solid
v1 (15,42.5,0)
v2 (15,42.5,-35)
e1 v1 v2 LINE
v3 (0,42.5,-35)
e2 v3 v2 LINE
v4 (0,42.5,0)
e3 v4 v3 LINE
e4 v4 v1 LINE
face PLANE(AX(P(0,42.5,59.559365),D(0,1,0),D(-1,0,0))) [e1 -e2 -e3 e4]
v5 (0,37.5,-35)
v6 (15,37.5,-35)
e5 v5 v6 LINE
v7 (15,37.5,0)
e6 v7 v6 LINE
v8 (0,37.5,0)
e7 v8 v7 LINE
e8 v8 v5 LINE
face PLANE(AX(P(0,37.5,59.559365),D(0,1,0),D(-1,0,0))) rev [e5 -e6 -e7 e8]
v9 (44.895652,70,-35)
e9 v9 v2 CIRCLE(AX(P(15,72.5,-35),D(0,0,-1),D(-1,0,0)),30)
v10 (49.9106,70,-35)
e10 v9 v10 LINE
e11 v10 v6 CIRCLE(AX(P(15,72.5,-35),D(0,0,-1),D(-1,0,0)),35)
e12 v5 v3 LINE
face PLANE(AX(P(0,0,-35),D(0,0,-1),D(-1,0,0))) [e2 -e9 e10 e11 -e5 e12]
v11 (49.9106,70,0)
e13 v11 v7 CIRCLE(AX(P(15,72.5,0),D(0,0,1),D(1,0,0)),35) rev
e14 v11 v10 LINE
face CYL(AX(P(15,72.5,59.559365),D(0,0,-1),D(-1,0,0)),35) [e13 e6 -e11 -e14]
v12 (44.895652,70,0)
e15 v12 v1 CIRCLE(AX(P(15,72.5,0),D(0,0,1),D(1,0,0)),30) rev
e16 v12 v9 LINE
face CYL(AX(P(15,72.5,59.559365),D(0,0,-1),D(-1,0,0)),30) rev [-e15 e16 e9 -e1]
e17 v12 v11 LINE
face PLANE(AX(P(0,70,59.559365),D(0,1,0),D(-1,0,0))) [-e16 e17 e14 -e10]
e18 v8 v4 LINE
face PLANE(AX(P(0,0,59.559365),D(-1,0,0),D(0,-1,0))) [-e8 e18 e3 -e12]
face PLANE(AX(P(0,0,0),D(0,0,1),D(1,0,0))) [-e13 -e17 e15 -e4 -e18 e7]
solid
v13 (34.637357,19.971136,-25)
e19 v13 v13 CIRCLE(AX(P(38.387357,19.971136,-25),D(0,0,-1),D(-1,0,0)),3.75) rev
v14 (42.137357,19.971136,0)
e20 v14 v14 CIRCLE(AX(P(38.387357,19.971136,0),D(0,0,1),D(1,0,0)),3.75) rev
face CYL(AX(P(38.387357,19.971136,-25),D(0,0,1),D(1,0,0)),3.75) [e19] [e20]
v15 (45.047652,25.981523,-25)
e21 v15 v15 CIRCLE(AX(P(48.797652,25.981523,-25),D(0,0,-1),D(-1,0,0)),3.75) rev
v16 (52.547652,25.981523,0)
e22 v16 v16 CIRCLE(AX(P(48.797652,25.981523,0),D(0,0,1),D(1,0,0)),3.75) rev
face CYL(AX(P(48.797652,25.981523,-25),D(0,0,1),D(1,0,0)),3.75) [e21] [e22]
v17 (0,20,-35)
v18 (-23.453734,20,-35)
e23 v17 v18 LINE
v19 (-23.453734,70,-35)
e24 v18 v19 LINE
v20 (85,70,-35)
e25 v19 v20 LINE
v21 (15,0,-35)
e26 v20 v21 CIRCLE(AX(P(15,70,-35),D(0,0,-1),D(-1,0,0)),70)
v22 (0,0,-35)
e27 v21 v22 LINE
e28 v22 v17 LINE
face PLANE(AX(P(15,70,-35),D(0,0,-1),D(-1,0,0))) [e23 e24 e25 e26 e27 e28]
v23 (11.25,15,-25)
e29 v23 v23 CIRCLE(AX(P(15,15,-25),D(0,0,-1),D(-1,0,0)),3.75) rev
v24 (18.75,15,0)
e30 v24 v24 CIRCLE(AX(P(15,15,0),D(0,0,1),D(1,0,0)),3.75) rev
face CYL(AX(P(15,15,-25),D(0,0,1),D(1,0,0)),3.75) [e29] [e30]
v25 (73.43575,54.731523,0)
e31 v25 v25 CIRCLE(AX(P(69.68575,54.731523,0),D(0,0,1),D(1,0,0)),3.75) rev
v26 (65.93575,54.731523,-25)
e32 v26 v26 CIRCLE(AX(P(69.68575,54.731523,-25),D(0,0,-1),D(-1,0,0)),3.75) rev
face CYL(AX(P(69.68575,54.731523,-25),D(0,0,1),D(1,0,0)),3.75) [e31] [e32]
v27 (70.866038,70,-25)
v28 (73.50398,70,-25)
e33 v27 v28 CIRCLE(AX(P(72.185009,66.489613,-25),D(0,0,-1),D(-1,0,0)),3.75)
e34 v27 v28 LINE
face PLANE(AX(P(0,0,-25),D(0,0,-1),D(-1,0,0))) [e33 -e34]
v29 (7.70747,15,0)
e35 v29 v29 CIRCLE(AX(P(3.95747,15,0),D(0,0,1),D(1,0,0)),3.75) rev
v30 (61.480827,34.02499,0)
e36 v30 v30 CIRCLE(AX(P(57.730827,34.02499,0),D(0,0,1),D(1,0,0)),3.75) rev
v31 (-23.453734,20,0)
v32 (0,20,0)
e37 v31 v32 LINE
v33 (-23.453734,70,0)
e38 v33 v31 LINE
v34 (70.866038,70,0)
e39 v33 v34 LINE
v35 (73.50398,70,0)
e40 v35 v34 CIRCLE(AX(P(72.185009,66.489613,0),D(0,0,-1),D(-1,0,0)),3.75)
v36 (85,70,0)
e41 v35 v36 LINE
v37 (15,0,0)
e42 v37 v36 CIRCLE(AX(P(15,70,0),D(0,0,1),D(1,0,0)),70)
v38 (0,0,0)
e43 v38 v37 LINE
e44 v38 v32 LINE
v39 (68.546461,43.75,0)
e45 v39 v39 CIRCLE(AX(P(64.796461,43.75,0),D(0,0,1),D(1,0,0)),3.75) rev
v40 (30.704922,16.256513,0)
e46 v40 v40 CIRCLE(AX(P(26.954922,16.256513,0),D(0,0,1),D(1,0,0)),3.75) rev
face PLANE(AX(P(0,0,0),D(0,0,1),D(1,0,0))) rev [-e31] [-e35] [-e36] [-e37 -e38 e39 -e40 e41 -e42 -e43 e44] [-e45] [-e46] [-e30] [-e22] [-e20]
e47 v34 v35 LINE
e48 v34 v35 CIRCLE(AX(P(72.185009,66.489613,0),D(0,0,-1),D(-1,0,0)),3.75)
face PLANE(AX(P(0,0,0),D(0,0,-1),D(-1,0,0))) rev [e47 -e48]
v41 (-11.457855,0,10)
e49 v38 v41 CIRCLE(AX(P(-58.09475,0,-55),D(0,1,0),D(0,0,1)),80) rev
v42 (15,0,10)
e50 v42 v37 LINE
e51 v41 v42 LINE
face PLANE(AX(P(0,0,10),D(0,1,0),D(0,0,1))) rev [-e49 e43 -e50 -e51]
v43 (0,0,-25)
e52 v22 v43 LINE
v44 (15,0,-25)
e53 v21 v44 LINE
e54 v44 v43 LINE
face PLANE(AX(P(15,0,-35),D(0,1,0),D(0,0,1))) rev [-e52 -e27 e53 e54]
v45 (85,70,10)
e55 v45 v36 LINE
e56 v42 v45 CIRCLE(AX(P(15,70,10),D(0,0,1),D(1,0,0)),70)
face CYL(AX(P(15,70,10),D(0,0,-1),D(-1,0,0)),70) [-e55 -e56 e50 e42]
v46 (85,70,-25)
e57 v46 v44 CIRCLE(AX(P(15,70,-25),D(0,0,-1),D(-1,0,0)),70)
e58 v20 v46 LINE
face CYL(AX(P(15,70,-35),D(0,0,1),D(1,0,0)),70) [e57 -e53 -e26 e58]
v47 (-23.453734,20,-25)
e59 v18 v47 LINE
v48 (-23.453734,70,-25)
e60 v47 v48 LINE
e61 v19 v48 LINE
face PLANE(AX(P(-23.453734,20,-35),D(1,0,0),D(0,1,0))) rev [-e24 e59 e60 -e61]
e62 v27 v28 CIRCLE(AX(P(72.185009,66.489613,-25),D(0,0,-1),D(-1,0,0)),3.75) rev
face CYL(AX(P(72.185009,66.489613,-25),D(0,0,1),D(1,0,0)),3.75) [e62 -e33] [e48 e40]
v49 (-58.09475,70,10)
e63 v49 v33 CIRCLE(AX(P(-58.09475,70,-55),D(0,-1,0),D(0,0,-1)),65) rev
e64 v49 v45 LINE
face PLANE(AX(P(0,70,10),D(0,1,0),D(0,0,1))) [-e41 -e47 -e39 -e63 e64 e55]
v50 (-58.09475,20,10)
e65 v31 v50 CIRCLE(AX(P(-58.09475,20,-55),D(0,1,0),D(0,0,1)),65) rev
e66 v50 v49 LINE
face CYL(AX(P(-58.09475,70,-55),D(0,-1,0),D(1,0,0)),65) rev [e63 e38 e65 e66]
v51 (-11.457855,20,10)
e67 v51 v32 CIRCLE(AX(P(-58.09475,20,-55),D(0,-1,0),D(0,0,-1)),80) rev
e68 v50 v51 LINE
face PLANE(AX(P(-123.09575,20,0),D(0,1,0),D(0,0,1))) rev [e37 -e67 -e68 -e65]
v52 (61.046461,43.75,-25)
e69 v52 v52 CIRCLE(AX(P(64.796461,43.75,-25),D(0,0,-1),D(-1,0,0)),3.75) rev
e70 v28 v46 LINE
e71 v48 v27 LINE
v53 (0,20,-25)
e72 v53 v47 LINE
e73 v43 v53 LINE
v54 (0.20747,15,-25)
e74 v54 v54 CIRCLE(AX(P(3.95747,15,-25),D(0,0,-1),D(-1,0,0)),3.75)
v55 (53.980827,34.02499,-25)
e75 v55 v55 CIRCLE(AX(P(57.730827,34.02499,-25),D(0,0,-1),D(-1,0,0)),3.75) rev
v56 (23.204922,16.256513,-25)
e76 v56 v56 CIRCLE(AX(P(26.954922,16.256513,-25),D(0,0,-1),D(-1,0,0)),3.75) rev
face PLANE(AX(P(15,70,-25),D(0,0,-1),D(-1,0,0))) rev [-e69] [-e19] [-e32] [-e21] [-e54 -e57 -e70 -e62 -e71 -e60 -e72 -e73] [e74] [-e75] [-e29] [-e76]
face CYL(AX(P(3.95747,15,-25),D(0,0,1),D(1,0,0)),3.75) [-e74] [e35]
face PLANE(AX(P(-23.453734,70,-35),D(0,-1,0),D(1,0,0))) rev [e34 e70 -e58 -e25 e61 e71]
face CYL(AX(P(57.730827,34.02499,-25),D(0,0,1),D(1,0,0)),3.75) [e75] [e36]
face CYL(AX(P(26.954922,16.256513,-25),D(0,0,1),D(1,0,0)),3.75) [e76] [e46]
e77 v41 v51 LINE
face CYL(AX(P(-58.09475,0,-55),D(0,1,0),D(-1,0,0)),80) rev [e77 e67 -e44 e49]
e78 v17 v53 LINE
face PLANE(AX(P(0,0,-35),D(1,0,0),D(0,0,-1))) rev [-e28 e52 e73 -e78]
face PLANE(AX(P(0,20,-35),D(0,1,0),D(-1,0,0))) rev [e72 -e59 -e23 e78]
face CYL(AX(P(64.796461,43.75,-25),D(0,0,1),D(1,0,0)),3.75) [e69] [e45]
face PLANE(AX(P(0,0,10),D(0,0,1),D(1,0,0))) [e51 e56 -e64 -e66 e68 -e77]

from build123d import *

# Parameters (mm, degrees)
EXTRUDE_1_DEPTH = 10
EXTRUDE_3_DEPTH = 20
EXTRUDE_START   = 20
EXTRUDE_4_DEPTH = 50
EXTRUDE_START_2 = 25
EXTRUDE_5_DEPTH = 10
SKETCH_3_R      = 3.75
EXTRUDE_6_DEPTH = 25
EXTRUDE_9_DEPTH = 35


# Read off the part's stored shape, not the designer's step: 凸台-拉伸3, 凸台-拉伸4
with BuildPart() as part:
    # 草图1 → 凸台-拉伸1 (new body)
    with BuildSketch(Plane.XY):
        with BuildLine():
            Line((0, 0), (15, 0))
            ThreePointArc((15, 0), (64.497474683, 20.502525317), (85, 70))
            Line((85, 70), (15, 70))
            Line((15, 70), (0, 70))
            Line((0, 70), (0, 20))
            Line((0, 20), (0, 0))
        make_face()
    extrude(amount=EXTRUDE_1_DEPTH)

    # 凸台-拉伸3 outline → 凸台-拉伸3 (add)
    with BuildSketch(Plane(origin=(0, 0, 0), x_dir=(1, 0, 0), z_dir=(0, 1, 0))):
        with BuildLine():
            ThreePointArc((0, 0), (-5.490763746, -5.272884533), (-11.457854928, -10))
            Line((-11.457854928, -10), (0, -10))
            Line((0, -10), (0, 0))
        make_face()
    extrude(amount=EXTRUDE_3_DEPTH)

    # 凸台-拉伸4 outline → 凸台-拉伸4 (add)
    with BuildSketch(Plane(origin=(0, 0, 0), x_dir=(1, 0, 0), z_dir=(0, 1, 0)).offset(EXTRUDE_START)):
        with BuildLine():
            ThreePointArc((-23.453734042, 0), (-40.066993816, -7.449979984), (-58.094750193, -10))
            Line((-58.094750193, -10), (0, -10))
            Line((0, -10), (0, 0))
            Line((0, 0), (-23.453734042, 0))
        make_face()
    extrude(amount=EXTRUDE_4_DEPTH)



with BuildPart() as body_2:
    # 草图6 → 凸台-拉伸5 (new body)
    with BuildSketch(Plane(origin=(0, 0, 0), x_dir=(-1, 0, 0), z_dir=(0, 0, -1)).offset(EXTRUDE_START_2)):
        with BuildLine():
            Line((-15, 0), (0, 0))
            Line((0, 0), (0, 20))
            Line((0, 20), (23.453734042, 20))
            Line((23.453734042, 20), (23.453734042, 70))
            Line((23.453734042, 70), (-85, 70))
            ThreePointArc((-85, 70), (-64.497474683, 20.502525317), (-15, 0))
        make_face()
    extrude(amount=EXTRUDE_5_DEPTH)


with BuildPart() as part_1:
    add(part.part)

    add(body_2.part)  # 凸台-拉伸6 merges body 2
    # 草图3 → 凸台-拉伸6 (add)
    with BuildSketch(Plane(origin=(0, 0, 0), x_dir=(-1, 0, 0), z_dir=(0, 0, -1))):
        with Locations(Location((-15, 15, 0), (0, 0, 180))):
            Circle(SKETCH_3_R)
        with Locations(Location((-26.954922222, 16.256512958, 0), (0, 0, 180))):
            Circle(SKETCH_3_R)
        with Locations(Location((-38.387356977, 19.971136186, 0), (0, 0, 180))):
            Circle(SKETCH_3_R)
        with Locations(Location((-48.797652007, 25.981522823, 0), (0, 0, 180))):
            Circle(SKETCH_3_R)
        with Locations(Location((-57.730827465, 34.024990134, 0), (0, 0, 180))):
            Circle(SKETCH_3_R)
        with Locations(Location((-64.796460718, 43.75, 0), (0, 0, 180))):
            Circle(SKETCH_3_R)
        with Locations(Location((-69.685749687, 54.731522823, 0), (0, 0, 180))):
            Circle(SKETCH_3_R)
        with Locations(Location((-72.185008984, 66.489613362, 0), (0, 0, 110.592904033))):
            Circle(SKETCH_3_R)
        with Locations(Location((-3.957469551, 15, 0), (0, 0, 180))):
            Circle(SKETCH_3_R)
    extrude(amount=EXTRUDE_6_DEPTH)


with BuildPart() as body_2_2:
    # 草图8 → 凸台-拉伸9 (new body)
    with BuildSketch(Plane(origin=(0, 0, -35), x_dir=(-1, 0, 0), z_dir=(0, 0, -1))):
        with BuildLine():
            Line((-15, 37.5), (0, 37.5))
            Line((0, 37.5), (0, 42.5))
            Line((0, 42.5), (-15, 42.5))
            ThreePointArc((-15, 42.5), (-35.310096012, 50.420597834), (-44.895651858, 70))
            Line((-44.895651858, 70), (-44.919254128, 70))
            Line((-44.919254128, 70), (-49.910600109, 70))
            ThreePointArc((-49.910600109, 70), (-38.848480035, 46.882623085), (-15, 37.5))
        make_face()
    extrude(amount=-EXTRUDE_9_DEPTH)


solid = Compound([part_1.part, body_2_2.part])
